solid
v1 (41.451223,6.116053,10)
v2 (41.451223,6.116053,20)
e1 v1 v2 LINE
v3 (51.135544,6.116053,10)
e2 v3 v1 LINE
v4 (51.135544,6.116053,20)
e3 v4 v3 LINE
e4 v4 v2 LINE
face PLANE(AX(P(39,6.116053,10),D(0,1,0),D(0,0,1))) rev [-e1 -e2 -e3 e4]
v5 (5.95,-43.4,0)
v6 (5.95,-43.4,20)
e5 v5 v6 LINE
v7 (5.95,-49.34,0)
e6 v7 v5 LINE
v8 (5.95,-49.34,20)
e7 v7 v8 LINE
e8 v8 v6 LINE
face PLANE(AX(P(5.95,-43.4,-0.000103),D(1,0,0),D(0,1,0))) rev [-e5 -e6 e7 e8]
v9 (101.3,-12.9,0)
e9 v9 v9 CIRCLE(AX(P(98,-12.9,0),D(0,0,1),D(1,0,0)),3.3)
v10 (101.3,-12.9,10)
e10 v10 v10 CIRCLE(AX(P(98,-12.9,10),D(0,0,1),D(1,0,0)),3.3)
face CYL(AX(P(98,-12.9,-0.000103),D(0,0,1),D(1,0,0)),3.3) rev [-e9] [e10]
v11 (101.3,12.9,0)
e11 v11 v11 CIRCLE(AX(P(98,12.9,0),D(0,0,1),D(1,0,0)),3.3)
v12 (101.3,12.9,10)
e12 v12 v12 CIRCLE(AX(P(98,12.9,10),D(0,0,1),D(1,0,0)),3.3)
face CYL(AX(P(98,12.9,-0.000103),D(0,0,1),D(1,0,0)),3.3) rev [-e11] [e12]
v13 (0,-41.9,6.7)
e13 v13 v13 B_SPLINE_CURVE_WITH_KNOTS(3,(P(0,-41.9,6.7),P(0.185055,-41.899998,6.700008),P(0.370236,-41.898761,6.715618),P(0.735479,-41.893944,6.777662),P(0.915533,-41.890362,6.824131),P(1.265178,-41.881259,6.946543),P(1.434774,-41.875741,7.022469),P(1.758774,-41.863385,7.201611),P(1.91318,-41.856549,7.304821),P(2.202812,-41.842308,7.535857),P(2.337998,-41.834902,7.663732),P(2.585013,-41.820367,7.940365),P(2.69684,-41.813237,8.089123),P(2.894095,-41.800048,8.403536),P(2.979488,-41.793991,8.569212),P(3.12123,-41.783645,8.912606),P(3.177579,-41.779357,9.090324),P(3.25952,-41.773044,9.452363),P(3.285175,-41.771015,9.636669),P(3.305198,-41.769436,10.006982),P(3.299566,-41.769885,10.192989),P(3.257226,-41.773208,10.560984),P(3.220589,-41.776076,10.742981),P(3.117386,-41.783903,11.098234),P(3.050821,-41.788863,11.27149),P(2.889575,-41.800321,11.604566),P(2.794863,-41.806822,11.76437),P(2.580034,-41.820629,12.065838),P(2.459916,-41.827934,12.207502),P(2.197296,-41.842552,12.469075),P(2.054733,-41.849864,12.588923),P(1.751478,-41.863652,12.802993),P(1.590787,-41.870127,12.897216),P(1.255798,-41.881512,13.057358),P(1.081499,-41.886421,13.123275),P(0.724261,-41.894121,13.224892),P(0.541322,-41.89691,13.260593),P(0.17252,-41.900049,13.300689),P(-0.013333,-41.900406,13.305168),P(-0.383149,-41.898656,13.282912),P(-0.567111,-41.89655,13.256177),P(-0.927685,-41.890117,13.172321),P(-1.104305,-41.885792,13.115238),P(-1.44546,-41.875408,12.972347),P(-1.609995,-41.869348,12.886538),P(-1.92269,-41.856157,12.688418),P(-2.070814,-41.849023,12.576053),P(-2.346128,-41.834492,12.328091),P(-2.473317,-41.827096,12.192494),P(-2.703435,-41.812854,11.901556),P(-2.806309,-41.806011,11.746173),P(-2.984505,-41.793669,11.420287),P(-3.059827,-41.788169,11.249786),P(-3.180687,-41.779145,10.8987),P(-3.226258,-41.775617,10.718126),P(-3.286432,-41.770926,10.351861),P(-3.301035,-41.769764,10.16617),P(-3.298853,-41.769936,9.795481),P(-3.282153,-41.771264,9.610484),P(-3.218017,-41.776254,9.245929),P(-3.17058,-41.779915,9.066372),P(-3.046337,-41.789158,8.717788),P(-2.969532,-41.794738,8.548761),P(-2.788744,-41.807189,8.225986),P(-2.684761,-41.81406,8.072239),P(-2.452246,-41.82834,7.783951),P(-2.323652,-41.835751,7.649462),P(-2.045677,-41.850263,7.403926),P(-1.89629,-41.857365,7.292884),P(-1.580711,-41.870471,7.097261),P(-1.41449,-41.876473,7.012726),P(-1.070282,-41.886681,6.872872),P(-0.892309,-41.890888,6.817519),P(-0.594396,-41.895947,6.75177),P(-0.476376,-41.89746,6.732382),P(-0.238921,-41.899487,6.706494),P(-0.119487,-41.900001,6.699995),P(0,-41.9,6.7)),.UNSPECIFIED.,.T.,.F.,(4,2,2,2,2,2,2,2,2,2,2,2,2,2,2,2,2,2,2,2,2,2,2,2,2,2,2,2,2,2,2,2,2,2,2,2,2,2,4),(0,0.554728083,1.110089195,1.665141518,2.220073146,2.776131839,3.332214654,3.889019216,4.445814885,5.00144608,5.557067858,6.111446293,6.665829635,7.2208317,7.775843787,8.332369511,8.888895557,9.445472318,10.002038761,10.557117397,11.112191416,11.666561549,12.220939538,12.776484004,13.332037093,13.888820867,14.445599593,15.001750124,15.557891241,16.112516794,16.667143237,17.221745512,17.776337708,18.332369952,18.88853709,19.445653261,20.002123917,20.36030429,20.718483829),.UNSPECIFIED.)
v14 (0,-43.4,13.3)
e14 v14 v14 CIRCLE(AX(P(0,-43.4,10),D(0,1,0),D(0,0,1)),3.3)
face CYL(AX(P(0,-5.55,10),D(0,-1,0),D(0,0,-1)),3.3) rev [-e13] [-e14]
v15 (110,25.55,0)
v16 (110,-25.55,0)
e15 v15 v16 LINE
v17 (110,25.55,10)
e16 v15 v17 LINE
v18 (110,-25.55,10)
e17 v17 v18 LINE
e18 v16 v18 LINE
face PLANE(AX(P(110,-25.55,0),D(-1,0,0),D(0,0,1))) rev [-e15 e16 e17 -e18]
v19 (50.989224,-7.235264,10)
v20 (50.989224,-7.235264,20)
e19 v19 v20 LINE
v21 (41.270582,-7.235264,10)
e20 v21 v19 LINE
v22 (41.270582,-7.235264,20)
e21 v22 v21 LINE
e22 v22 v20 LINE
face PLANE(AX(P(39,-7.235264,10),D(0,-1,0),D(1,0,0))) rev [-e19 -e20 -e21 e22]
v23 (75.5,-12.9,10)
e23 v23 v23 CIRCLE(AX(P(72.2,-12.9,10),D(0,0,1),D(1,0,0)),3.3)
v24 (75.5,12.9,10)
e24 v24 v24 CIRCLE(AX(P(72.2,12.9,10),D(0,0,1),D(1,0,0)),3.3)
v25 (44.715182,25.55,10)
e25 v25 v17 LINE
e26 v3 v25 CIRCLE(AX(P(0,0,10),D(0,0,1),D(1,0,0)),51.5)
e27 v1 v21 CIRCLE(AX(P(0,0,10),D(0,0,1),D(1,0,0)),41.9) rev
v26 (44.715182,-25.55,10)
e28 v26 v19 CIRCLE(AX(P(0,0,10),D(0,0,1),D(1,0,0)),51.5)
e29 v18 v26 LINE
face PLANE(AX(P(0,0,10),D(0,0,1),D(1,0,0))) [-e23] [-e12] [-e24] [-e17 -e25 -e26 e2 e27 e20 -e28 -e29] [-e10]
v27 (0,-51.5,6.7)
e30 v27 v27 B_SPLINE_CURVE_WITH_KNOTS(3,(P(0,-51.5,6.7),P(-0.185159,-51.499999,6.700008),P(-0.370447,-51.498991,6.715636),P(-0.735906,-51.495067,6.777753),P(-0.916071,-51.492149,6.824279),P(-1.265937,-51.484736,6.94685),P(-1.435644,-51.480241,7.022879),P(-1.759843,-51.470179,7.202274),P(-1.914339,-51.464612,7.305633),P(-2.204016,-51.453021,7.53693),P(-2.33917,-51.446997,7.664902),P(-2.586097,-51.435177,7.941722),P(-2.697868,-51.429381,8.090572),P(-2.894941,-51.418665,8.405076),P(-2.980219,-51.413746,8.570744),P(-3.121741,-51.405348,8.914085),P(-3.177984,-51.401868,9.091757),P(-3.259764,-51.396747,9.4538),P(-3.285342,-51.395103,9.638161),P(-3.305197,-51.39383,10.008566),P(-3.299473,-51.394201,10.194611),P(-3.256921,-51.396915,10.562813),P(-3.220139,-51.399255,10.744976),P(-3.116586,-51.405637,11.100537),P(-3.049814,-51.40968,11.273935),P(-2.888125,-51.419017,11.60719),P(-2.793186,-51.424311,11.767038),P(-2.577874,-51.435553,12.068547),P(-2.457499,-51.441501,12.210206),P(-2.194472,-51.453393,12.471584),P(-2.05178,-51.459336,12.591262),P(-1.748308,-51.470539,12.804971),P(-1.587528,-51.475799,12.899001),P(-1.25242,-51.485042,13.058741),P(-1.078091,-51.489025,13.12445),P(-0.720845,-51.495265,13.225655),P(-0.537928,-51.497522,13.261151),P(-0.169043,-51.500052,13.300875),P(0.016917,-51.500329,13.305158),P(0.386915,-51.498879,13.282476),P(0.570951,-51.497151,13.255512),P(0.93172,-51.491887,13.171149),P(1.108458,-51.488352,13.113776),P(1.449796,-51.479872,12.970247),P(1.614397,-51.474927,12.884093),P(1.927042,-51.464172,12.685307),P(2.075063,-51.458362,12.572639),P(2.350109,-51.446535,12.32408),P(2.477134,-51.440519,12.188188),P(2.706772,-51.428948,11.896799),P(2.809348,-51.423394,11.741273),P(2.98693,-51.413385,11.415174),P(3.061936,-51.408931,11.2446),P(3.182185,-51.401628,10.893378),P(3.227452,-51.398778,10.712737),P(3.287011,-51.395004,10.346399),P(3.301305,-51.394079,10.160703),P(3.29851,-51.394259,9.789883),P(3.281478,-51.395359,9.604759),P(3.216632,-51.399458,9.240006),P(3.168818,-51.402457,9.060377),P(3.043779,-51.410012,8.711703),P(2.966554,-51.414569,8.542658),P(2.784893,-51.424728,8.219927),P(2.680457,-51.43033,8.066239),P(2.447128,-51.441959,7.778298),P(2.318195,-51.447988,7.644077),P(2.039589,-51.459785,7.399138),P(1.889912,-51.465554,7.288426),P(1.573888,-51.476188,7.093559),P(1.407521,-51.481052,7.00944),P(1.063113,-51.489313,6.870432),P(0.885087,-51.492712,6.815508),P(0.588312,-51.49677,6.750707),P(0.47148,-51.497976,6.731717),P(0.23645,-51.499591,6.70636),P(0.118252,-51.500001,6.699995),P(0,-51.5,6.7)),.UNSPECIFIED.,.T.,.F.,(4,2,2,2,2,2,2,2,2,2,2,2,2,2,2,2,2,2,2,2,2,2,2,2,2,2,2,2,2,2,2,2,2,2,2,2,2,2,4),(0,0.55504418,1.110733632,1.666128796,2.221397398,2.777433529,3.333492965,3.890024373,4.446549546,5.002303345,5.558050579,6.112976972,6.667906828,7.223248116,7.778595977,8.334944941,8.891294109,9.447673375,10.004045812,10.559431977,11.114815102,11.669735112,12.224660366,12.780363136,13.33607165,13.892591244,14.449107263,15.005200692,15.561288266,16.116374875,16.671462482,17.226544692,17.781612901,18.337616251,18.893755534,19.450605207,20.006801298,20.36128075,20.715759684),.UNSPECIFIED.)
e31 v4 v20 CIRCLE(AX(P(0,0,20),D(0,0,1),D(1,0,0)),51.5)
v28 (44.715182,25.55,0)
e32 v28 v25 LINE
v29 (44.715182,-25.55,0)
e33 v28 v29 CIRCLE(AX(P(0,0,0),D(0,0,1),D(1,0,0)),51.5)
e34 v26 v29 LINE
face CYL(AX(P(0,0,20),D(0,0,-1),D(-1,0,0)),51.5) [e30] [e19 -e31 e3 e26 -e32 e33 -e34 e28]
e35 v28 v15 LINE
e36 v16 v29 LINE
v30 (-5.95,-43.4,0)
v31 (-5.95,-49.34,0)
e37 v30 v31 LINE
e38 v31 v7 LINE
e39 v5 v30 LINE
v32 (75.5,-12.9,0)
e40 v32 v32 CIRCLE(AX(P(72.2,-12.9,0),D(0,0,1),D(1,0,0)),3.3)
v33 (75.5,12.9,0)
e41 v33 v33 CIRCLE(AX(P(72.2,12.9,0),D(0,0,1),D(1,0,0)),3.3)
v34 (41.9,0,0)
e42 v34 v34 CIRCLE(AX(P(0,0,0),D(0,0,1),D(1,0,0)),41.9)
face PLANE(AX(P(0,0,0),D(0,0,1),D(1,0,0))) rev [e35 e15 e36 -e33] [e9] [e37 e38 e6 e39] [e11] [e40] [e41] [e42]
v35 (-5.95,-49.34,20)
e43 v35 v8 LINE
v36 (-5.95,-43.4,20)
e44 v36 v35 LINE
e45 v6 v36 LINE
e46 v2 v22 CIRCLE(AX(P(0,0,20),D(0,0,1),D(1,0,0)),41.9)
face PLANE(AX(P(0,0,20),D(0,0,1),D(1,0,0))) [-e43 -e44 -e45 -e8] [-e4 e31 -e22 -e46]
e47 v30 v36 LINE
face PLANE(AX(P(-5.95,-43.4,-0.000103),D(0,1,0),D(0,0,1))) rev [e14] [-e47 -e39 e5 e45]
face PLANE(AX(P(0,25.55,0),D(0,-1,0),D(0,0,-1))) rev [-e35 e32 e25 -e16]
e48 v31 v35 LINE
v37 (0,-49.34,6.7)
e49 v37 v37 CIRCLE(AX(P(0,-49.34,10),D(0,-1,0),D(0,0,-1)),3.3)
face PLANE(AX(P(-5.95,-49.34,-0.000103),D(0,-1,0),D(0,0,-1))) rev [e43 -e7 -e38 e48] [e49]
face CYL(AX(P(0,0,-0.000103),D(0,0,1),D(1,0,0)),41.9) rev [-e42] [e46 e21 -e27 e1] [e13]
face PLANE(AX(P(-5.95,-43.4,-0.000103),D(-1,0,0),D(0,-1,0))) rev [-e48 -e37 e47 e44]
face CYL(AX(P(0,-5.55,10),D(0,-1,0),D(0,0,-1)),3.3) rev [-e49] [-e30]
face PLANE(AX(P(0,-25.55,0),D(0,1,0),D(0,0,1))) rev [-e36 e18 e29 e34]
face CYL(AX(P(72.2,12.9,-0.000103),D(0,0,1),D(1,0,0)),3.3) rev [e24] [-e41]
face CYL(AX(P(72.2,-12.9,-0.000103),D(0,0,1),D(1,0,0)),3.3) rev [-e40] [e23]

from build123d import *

# Parameters (mm, degrees)
SKETCH1_R              = 51.5
BOSS_EXTRUDE1_DEPTH    = 20
BOSS_EXTRUDE2_DEPTH    = 10
SKETCH2_R              = 41.9
CUT_EXTRUDE1_DEPTH     = 124.094475912
SKETCH3_W              = 35
SKETCH3_H              = 13.351317372
CUT_EXTRUDE2_DEPTH     = 10
SKETCH4_W              = 11.9
SKETCH4_H              = 5.94
CUT_EXTRUDE3_DEPTH     = 124.094475912
CUT_EXTRUDE4_START     = -51.500000101
CUT_EXTRUDE4_OUTLINE_R = 3.3
CUT_EXTRUDE4_DEPTH     = 9.730154575
SKETCH5_R              = 3.3
CUT_EXTRUDE5_DEPTH     = 122.869807632


# Read off the part's stored shape, not the designer's step: Cut-Extrude4
with BuildPart() as part:
    # Sketch1 → Boss-Extrude1 (new body)
    with BuildSketch(Plane.XY):
        Circle(SKETCH1_R)
    extrude(amount=BOSS_EXTRUDE1_DEPTH)

    # 3DSketch1 → Boss-Extrude2 (add)
    with BuildSketch(Plane(origin=(0, -25.55, 0), x_dir=(0.9069189732091603, 0.4213050866453462, 0), z_dir=(0, 0, -1))):
        Polygon((0, 0), (99.761087053, 46.343559531), (121.289776981, 0), (21.528689928, -46.343559531), align=None)
    extrude(amount=-BOSS_EXTRUDE2_DEPTH)

    # Sketch2 → Cut-Extrude1 (cut, through all)
    with BuildSketch(Plane.XY.offset(20)):
        Circle(SKETCH2_R)
    extrude(amount=-CUT_EXTRUDE1_DEPTH, mode=Mode.SUBTRACT)

    # Sketch3 → Cut-Extrude2 (cut)
    with BuildSketch(Plane.XY.offset(20)):
        with Locations((56.5, -0.55960538)):
            Rectangle(SKETCH3_W, SKETCH3_H)
    extrude(amount=-CUT_EXTRUDE2_DEPTH, mode=Mode.SUBTRACT)

    # Sketch4 → Cut-Extrude3 (cut, through all)
    with BuildSketch(Plane.XY.offset(20)):
        with Locations((0, -46.37)):
            Rectangle(SKETCH4_W, SKETCH4_H)
    extrude(amount=-CUT_EXTRUDE3_DEPTH, mode=Mode.SUBTRACT)

    # Cut-Extrude4 outline → Cut-Extrude4 (cut)
    with BuildSketch(Plane(origin=(0, 0, 0), x_dir=(1, 0, 0), z_dir=(0, 1, 0)).offset(CUT_EXTRUDE4_START)):
        with Locations((0, -10)):
            Circle(CUT_EXTRUDE4_OUTLINE_R)
    extrude(amount=CUT_EXTRUDE4_DEPTH, mode=Mode.SUBTRACT)

    # Sketch5 → Cut-Extrude5 (cut, through all)
    with BuildSketch(Plane.XY.offset(10)):
        with Locations((72.2, 12.9)):
            Circle(SKETCH5_R)
        with Locations((98, 12.9)):
            Circle(SKETCH5_R)
        with Locations((98, -12.9)):
            Circle(SKETCH5_R)
        with Locations((72.2, -12.9)):
            Circle(SKETCH5_R)
    extrude(amount=-CUT_EXTRUDE5_DEPTH, mode=Mode.SUBTRACT)


solid = part.part
